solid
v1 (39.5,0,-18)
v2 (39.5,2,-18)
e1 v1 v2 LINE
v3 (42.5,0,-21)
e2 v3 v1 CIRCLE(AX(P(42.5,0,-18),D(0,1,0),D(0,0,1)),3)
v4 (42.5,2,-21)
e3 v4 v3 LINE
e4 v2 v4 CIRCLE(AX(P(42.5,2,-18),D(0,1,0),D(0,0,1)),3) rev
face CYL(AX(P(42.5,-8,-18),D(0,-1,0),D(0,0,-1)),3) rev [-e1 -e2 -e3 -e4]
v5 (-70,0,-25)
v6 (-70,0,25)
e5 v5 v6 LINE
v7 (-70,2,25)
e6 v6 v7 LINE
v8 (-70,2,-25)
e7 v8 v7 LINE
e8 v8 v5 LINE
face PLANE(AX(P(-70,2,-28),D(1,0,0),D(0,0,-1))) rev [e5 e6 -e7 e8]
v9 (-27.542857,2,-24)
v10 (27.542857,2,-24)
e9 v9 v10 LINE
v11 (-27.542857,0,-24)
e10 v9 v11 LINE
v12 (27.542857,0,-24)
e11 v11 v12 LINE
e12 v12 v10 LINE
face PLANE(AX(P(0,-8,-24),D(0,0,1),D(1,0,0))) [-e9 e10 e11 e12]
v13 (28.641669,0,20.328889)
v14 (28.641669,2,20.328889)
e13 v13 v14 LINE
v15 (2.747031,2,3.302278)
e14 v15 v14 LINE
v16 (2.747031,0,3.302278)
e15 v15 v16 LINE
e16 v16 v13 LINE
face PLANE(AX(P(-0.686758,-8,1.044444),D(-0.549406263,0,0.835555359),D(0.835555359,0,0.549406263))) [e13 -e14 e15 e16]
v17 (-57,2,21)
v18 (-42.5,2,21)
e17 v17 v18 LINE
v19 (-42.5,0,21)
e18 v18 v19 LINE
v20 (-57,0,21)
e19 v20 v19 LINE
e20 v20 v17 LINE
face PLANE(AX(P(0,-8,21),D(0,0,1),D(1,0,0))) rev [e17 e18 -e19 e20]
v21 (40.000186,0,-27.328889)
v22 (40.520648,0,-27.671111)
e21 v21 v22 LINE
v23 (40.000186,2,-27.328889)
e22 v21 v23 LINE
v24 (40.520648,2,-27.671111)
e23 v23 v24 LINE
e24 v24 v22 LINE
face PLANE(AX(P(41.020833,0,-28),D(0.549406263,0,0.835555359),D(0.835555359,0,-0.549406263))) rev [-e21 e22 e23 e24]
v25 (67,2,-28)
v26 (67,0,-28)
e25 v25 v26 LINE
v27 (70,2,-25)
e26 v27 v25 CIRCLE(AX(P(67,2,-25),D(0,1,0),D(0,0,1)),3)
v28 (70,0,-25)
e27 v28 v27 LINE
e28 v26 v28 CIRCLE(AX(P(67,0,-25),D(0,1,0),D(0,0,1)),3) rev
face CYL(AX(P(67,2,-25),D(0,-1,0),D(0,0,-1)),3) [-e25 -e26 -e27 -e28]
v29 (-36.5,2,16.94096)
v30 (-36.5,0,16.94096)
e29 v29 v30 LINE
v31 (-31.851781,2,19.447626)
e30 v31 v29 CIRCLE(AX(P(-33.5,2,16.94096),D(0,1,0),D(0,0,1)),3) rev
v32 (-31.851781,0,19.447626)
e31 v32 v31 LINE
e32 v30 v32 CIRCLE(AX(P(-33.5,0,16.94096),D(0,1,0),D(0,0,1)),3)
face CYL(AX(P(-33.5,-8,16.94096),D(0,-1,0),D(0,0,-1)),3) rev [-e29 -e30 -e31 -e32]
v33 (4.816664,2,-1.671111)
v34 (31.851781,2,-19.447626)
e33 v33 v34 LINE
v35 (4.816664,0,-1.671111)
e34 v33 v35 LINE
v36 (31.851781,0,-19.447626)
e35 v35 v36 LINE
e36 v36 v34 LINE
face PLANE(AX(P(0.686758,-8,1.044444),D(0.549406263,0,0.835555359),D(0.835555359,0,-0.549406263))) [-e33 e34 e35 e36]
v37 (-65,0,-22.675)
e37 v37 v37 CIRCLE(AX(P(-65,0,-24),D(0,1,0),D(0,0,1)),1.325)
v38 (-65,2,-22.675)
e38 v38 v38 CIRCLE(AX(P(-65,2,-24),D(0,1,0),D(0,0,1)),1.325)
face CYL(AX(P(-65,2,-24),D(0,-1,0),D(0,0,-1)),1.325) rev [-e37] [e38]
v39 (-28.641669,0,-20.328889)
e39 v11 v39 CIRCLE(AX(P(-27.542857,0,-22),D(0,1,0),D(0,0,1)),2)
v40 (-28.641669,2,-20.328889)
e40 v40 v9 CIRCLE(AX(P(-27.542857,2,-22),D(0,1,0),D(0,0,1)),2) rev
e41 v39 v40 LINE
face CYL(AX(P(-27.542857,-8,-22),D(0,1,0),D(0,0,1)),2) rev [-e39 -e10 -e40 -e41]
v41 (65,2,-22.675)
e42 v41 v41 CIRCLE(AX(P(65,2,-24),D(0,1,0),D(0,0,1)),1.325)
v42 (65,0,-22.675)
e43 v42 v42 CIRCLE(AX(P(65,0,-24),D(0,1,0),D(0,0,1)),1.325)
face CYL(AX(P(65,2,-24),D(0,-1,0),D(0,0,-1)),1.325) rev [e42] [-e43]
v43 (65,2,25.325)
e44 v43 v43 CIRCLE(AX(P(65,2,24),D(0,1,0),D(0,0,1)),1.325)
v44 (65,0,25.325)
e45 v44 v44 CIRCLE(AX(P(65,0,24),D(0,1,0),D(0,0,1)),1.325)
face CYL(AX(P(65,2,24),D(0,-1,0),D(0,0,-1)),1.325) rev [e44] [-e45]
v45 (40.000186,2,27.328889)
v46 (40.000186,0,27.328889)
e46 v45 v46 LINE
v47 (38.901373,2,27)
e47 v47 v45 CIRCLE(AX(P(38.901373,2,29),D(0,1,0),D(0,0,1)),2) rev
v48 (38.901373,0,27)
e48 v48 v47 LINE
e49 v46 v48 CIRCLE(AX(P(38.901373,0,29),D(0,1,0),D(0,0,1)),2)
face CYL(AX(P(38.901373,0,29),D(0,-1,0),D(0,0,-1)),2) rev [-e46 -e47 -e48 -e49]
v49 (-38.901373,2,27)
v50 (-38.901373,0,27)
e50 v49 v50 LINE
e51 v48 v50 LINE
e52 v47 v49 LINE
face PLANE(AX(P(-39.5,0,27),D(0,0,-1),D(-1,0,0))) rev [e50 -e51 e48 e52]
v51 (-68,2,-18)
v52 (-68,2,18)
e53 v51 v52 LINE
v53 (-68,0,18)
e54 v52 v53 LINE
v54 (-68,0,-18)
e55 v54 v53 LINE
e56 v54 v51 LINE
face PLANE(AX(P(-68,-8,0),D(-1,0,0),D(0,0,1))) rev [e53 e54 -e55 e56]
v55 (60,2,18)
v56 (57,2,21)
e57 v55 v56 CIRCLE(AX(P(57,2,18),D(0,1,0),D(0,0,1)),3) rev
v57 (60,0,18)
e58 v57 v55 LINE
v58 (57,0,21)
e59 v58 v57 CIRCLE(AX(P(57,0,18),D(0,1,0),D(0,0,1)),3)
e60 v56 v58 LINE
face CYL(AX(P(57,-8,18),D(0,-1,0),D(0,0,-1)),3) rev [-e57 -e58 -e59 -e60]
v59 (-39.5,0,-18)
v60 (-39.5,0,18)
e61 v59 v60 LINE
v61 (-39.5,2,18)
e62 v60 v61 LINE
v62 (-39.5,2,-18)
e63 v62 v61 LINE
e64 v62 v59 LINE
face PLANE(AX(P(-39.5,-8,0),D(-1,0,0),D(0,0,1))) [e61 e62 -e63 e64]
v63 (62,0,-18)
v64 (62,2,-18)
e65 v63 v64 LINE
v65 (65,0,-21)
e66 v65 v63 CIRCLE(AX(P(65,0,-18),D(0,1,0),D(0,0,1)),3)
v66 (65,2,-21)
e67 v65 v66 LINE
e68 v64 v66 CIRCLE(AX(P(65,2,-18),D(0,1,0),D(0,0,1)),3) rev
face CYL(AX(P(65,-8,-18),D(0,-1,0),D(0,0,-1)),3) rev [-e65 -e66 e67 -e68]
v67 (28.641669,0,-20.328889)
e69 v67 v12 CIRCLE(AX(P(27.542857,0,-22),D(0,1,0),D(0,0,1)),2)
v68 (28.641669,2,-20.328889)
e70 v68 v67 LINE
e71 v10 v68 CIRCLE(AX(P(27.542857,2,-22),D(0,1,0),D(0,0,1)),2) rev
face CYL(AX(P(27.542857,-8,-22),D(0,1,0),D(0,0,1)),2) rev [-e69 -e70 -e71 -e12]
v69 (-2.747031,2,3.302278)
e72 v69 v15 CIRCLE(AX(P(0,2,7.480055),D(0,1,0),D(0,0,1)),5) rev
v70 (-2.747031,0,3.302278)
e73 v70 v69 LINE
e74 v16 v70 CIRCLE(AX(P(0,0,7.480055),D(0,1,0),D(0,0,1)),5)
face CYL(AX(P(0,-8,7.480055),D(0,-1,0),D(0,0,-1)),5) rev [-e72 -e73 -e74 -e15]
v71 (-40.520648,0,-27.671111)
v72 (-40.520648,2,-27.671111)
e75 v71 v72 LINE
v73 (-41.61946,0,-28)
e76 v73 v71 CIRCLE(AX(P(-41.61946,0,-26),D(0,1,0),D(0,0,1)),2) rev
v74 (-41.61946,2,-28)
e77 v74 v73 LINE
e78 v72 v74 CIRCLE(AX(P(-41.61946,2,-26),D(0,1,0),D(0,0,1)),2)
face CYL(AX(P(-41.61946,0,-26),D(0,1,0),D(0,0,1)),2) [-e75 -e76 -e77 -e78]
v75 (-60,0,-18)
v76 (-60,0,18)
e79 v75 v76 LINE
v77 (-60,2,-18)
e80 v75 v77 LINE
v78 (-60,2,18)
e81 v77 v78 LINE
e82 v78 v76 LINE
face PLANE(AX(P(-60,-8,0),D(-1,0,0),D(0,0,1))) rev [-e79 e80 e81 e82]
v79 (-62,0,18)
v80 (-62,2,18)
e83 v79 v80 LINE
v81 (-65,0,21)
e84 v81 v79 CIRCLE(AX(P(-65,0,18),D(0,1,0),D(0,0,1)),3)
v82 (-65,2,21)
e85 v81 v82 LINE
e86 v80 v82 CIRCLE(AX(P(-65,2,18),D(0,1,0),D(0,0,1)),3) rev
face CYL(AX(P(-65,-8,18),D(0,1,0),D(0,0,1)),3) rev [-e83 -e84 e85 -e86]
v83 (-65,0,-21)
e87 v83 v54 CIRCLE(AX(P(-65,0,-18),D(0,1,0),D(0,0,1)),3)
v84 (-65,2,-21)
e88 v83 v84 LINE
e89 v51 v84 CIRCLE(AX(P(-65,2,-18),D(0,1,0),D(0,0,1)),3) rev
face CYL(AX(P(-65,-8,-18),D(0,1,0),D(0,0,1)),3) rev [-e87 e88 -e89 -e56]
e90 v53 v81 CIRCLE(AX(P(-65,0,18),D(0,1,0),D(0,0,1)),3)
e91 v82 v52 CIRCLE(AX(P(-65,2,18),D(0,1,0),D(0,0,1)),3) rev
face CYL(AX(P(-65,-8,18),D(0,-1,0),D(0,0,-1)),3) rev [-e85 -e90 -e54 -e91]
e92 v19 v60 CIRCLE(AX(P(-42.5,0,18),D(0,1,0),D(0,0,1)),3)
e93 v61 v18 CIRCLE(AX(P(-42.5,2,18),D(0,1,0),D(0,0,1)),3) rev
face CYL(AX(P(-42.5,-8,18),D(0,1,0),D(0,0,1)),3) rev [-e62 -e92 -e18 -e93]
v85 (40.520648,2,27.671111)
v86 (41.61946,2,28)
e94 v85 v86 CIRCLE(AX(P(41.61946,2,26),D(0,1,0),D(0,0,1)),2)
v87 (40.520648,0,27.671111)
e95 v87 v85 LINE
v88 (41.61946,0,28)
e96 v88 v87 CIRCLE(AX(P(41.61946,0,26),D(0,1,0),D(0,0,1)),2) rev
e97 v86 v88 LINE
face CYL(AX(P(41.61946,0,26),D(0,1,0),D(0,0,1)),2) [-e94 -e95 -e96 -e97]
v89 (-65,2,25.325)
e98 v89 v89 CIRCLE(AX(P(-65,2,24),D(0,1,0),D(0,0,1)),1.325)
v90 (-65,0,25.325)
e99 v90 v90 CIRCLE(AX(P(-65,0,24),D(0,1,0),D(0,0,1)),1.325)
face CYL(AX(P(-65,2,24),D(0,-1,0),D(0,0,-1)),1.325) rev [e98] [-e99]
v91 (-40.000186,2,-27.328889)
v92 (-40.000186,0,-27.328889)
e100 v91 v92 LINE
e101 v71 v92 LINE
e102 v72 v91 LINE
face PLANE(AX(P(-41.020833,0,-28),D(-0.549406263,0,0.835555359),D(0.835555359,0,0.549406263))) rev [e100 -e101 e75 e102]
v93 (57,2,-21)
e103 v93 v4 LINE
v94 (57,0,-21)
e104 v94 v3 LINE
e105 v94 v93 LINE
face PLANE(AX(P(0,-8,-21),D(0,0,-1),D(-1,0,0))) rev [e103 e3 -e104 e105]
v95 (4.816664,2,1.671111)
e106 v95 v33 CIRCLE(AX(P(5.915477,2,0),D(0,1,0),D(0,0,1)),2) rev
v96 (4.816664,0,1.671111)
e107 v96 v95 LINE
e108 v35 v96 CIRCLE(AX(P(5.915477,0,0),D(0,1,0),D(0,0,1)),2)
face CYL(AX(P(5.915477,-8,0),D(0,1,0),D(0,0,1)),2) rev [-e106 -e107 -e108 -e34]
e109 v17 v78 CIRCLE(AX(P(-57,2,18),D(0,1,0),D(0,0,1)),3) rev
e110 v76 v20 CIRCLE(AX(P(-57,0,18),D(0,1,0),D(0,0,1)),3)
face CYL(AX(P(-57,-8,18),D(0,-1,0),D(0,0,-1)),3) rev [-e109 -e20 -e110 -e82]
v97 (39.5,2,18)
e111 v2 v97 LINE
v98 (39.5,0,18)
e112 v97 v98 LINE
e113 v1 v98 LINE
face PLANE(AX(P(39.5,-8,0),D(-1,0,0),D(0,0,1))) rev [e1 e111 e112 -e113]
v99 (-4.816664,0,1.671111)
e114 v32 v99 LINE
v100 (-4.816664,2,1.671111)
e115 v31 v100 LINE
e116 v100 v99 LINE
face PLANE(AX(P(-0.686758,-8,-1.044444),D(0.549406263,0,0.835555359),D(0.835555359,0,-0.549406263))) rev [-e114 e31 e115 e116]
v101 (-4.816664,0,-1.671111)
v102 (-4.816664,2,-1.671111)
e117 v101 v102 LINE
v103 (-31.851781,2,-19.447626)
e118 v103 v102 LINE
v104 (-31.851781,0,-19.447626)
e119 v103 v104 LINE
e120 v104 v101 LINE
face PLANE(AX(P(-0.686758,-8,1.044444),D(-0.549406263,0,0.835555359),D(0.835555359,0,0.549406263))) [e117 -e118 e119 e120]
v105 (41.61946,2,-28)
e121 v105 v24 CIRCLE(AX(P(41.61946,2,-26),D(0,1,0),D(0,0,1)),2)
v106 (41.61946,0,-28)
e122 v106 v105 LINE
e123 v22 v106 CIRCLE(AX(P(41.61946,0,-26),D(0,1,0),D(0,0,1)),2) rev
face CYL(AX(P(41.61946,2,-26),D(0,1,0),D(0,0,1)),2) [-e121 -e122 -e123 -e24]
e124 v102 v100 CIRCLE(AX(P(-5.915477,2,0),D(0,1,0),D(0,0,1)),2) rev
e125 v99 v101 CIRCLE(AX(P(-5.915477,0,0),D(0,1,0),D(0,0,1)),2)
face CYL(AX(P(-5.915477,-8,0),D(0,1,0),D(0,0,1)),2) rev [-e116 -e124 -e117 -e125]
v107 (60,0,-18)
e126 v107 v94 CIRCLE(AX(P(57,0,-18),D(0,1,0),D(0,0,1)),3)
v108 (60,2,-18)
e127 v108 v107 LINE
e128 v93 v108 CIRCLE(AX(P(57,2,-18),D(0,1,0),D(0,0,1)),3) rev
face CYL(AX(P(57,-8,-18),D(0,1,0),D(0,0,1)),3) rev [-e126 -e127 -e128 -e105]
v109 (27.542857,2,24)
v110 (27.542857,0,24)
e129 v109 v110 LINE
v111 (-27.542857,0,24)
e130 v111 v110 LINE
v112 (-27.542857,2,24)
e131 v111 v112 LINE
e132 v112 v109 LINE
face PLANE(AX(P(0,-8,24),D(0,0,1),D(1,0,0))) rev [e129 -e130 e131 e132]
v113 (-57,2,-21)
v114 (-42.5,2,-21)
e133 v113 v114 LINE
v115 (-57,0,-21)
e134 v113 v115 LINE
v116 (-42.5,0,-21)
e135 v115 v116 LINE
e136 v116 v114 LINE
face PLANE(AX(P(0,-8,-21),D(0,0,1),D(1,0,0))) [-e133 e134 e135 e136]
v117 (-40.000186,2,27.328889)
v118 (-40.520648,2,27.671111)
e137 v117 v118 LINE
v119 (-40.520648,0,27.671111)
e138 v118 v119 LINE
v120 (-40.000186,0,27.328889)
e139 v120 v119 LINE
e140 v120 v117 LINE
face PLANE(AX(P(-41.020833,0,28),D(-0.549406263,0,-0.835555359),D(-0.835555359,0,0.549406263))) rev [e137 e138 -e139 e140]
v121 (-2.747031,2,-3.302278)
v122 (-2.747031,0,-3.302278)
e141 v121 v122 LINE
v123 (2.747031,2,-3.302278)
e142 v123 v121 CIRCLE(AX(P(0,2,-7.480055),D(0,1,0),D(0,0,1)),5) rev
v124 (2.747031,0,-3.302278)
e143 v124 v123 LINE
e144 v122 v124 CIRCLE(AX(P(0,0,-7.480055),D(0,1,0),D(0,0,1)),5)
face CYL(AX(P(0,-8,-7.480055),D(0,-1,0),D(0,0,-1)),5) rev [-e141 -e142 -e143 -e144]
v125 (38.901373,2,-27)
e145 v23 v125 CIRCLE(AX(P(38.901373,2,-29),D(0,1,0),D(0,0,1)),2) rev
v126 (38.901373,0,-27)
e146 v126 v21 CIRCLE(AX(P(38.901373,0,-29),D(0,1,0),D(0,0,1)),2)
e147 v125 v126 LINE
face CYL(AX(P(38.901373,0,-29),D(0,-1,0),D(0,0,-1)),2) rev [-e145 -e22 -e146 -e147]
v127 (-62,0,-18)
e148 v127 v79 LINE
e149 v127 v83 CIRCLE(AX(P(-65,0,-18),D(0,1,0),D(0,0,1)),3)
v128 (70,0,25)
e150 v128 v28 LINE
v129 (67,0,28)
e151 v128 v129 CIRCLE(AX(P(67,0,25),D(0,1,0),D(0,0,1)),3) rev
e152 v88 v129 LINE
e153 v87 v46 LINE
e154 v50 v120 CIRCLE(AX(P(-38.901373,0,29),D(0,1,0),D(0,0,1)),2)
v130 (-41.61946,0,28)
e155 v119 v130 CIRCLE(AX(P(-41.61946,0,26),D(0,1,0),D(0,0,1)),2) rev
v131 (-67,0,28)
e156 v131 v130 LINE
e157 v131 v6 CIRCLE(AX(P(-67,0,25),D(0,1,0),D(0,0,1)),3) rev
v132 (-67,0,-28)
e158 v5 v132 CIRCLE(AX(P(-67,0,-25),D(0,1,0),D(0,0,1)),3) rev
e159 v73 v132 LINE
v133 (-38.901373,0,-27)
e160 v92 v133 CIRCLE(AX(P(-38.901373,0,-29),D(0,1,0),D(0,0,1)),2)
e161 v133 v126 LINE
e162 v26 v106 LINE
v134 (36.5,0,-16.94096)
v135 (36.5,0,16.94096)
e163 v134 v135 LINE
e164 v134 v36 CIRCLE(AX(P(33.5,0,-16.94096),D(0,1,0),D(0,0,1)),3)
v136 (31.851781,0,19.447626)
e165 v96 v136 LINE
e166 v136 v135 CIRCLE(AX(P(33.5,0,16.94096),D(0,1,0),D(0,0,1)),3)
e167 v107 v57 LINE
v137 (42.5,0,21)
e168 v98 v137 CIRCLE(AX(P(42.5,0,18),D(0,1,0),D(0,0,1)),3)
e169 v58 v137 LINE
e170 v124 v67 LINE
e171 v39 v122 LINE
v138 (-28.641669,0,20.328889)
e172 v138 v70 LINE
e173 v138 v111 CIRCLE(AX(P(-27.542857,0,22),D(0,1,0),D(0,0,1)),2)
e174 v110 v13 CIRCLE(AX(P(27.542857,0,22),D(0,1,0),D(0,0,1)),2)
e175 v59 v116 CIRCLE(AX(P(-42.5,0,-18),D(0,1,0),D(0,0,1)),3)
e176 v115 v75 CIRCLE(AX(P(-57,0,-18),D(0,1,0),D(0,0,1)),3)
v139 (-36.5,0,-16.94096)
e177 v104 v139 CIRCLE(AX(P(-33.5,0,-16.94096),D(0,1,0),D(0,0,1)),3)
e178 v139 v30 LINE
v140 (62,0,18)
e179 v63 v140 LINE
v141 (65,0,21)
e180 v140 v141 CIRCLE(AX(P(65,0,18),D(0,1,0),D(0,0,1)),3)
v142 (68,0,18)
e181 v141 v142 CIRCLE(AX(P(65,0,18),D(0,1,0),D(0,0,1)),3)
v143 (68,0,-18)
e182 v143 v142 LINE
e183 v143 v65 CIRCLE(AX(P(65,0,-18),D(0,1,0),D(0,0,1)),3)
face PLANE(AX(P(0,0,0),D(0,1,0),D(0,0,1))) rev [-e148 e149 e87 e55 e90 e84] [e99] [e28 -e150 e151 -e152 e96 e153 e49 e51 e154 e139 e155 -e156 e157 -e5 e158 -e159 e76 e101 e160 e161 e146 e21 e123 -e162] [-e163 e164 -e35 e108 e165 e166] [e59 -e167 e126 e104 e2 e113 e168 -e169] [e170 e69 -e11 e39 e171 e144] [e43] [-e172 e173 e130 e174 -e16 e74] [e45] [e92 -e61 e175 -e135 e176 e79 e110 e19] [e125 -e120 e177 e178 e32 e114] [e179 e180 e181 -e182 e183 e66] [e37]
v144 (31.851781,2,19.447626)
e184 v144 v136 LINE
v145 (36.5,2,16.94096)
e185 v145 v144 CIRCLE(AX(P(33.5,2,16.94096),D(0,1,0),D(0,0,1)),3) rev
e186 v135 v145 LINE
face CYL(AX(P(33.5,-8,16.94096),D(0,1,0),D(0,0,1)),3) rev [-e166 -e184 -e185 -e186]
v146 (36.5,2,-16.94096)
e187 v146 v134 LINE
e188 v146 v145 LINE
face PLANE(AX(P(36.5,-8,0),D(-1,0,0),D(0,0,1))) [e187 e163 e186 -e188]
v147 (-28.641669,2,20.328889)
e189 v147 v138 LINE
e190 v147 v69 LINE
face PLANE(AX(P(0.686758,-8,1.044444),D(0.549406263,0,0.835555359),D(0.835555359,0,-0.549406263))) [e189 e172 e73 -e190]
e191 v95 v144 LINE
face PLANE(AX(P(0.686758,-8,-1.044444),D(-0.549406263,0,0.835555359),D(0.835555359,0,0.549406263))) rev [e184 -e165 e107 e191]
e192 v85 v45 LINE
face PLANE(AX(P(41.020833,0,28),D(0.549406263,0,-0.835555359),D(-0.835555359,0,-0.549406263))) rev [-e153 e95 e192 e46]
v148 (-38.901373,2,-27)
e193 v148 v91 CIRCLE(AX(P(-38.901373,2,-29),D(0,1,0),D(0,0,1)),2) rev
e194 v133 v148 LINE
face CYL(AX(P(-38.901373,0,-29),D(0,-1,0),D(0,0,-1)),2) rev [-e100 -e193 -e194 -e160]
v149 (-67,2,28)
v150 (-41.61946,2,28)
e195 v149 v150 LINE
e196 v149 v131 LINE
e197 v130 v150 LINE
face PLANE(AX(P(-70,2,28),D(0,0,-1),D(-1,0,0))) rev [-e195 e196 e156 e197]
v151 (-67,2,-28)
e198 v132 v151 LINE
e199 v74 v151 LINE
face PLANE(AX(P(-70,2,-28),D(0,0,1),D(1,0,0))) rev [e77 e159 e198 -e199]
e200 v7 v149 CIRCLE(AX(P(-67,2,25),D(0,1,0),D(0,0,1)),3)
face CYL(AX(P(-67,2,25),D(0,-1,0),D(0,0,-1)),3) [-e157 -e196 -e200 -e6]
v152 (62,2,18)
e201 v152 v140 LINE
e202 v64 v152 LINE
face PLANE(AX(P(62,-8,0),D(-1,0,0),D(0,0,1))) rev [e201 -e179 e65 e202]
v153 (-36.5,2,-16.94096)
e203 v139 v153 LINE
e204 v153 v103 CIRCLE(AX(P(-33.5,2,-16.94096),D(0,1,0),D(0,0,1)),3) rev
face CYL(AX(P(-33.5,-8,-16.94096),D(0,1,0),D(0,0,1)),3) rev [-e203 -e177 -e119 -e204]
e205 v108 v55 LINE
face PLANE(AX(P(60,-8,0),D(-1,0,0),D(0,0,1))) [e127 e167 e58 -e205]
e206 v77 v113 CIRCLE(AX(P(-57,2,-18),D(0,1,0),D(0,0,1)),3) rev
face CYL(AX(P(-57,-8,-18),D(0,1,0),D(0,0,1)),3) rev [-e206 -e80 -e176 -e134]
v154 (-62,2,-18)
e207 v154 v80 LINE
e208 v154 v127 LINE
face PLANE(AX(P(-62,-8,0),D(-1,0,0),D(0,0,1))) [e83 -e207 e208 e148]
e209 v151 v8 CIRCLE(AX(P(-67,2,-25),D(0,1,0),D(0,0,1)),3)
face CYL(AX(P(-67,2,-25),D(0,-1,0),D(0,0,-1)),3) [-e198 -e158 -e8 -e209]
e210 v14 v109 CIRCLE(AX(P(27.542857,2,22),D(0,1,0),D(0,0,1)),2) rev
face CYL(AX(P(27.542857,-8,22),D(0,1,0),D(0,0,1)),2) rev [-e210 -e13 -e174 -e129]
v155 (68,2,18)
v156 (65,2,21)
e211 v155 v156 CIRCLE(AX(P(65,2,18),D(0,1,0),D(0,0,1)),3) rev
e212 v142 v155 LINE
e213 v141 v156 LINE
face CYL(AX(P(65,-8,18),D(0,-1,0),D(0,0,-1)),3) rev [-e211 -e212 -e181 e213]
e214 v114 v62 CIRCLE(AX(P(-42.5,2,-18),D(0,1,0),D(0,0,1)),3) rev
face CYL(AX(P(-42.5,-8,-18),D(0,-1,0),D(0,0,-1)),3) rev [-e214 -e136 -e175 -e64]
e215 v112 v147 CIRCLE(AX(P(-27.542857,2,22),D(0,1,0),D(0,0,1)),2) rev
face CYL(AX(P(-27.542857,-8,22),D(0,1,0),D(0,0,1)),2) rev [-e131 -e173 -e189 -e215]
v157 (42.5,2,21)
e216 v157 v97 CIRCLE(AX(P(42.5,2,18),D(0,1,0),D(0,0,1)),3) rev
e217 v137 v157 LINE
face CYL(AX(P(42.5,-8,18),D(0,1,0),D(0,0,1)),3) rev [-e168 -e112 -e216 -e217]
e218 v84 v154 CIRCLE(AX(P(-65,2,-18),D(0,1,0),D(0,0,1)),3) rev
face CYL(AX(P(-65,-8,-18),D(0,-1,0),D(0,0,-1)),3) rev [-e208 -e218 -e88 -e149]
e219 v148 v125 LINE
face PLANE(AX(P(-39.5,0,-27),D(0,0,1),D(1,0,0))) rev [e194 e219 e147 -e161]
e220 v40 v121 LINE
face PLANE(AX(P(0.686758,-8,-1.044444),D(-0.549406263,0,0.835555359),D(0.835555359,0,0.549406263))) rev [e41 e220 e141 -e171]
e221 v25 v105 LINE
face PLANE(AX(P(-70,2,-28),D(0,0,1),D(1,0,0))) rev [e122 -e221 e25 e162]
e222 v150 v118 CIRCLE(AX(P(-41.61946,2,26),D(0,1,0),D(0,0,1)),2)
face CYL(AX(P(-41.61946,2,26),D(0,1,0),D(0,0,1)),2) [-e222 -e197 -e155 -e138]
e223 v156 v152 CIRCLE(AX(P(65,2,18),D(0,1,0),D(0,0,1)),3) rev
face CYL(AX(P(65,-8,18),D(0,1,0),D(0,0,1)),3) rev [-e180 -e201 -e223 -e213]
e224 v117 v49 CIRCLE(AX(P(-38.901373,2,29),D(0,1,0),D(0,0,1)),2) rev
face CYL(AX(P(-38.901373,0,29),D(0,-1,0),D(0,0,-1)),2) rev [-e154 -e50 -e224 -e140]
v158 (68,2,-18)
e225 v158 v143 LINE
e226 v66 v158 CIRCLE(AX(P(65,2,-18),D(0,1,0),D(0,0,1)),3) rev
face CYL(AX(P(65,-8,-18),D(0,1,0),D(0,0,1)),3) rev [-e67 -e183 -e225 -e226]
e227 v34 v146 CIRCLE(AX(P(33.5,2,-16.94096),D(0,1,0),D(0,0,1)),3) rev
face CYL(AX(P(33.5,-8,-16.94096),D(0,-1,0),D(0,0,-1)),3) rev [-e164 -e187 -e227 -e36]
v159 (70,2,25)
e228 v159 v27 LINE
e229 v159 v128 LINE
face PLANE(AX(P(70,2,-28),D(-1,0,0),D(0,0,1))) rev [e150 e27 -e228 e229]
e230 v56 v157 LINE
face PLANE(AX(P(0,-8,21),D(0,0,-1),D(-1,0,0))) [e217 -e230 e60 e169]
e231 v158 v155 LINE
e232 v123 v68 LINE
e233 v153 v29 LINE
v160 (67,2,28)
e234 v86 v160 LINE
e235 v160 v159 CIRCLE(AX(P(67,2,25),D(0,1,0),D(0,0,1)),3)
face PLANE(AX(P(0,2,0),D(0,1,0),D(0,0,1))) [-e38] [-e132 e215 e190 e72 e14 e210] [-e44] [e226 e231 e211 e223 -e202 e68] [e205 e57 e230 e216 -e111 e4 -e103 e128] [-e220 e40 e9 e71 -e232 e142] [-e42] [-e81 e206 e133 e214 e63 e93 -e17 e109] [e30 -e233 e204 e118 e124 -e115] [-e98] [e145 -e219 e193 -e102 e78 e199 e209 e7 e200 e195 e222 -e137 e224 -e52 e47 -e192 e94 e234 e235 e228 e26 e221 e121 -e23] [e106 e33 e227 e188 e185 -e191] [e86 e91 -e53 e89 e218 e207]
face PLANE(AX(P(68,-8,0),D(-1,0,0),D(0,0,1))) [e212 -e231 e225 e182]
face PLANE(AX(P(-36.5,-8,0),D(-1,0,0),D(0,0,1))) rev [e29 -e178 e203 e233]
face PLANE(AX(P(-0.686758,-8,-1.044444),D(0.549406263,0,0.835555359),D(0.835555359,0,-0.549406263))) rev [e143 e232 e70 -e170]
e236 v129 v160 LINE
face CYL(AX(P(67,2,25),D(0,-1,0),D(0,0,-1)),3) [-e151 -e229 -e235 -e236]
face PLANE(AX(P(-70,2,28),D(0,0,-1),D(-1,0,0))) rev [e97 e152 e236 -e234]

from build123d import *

# Parameters (mm, degrees)
SKETCH_1_W          = 140
SKETCH_1_H          = 56
SKETCH_1_R          = 1.325
EXTRUDE_1_DEPTH     = 2
SKETCH_3_W          = 20.5
SKETCH_3_H          = 42
SKETCH_3_W_2        = 6
CUT_EXTRUDE_1_DEPTH = 10
FILLET_1_R          = 3
FILLET_2_R          = 2
FILLET_3_R          = 3
FILLET_4_R          = 5
CUT_EXTRUDE_2_DEPTH = 76.41883054
FILLET_5_R          = 2


with BuildPart() as part:
    # 草图1 → 凸台-拉伸1 (new body)
    with BuildSketch(Plane(origin=(0, 0, 0), x_dir=(1, 0, 0), z_dir=(0, 1, 0))):
        Rectangle(SKETCH_1_W, SKETCH_1_H)
        with Locations(Location((-65, 24, 0), (0, 0, 270))):
            Circle(SKETCH_1_R, mode=Mode.SUBTRACT)
        with Locations(Location((65, 24, 0), (0, 0, 270))):
            Circle(SKETCH_1_R, mode=Mode.SUBTRACT)
        with Locations(Location((65, -24, 0), (0, 0, 270))):
            Circle(SKETCH_1_R, mode=Mode.SUBTRACT)
        with Locations(Location((-65, -24, 0), (0, 0, 270))):
            Circle(SKETCH_1_R, mode=Mode.SUBTRACT)
    extrude(amount=EXTRUDE_1_DEPTH)

    # 草图3 → 切除-拉伸1 (cut)
    with BuildSketch(Plane(origin=(0, 2, 0), x_dir=(1, 0, 0), z_dir=(0, 1, 0))):
        with Locations((-49.75, 0)):
            Rectangle(SKETCH_3_W, SKETCH_3_H)
        with Locations((-65, 0)):
            Rectangle(SKETCH_3_W_2, SKETCH_3_H)
        Polygon((-36.5, -22.50398901), (-2.275183381, 0), (-36.5, 22.50398901), align=None)
        Polygon((34.224816619, 24), (-34.224816619, 24), (0, 1.49601099), align=None)
        Polygon((36.5, 22.50398901), (2.275183381, 0), (36.5, -22.50398901), align=None)
        Polygon((34.224816619, -24), (0, -1.49601099), (-34.224816619, -24), align=None)
        with Locations((49.75, 0)):
            Rectangle(SKETCH_3_W, SKETCH_3_H)
        with Locations((65, 0)):
            Rectangle(SKETCH_3_W_2, SKETCH_3_H)
    extrude(amount=-CUT_EXTRUDE_1_DEPTH, mode=Mode.SUBTRACT)

    # 圆角1
    fillet_1_edges = [part.edges().sort_by_distance(p)[0] for p in [
        (68, 1, -21),
        (68, 1, 21),
        (62, 1, 21),
        (62, 1, -21),
        (-60, 1, 21),
        (-60, 1, -21),
        (-39.5, 1, -21),
        (-39.5, 1, 21),
        (70, 1, 28),
        (-70, 1, 28),
        (-70, 1, -28),
        (70, 1, -28),
        (-62, 1, -21),
        (-62, 1, 21),
        (-68, 1, 21),
        (-68, 1, -21),
        (60, 1, -21),
        (60, 1, 21),
        (39.5, 1, 21),
        (39.5, 1, -21),
    ]]
    fillet(fillet_1_edges, radius=FILLET_1_R - 0.0001)  # a hair under: the kernel refuses the full size

    # 圆角2
    fillet_2_edges = [part.edges().sort_by_distance(p)[0] for p in [
        (-34.224816619, 1, -24),
        (34.224816619, 1, -24),
        (2.275183381, 1, 0),
        (-2.275183381, 1, 0),
        (-34.224816619, 1, 24),
        (34.224816619, 1, 24),
    ]]
    fillet(fillet_2_edges, radius=FILLET_2_R)

    # 圆角3
    fillet_3_edges = [part.edges().sort_by_distance(p)[0] for p in [
        (36.5, 1, -22.50398901),
        (36.5, 1, 22.50398901),
        (-36.5, 1, -22.50398901),
        (-36.5, 1, 22.50398901),
    ]]
    fillet(fillet_3_edges, radius=FILLET_3_R)

    # 圆角4
    fillet_4_edges = [part.edges().sort_by_distance(p)[0] for p in [
        (0, 1, -1.49601099),
        (0, 1, 1.49601099),
    ]]
    fillet(fillet_4_edges, radius=FILLET_4_R)

    # 草图4 → 切除-拉伸2 (cut, through all)
    with BuildSketch(Plane(origin=(0, 2, 0), x_dir=(1, 0, 0), z_dir=(0, 1, 0))):
        Polygon((-41.020833333, 28), (-39.5, 27), (39.5, 27), (41.020833333, 28), align=None)
        Polygon((41.020833333, -28), (39.5, -27), (-39.5, -27), (-41.020833333, -28), align=None)
    extrude(amount=-CUT_EXTRUDE_2_DEPTH, mode=Mode.SUBTRACT)

    # 圆角5
    fillet_5_edges = [part.edges().sort_by_distance(p)[0] for p in [
        (-41.020833333, 1, -28),
        (41.020833333, 1, -28),
        (39.5, 1, -27),
        (-39.5, 1, -27),
        (41.020833333, 1, 28),
        (-41.020833333, 1, 28),
        (-39.5, 1, 27),
        (39.5, 1, 27),
    ]]
    fillet(fillet_5_edges, radius=FILLET_5_R)


solid = part.part
